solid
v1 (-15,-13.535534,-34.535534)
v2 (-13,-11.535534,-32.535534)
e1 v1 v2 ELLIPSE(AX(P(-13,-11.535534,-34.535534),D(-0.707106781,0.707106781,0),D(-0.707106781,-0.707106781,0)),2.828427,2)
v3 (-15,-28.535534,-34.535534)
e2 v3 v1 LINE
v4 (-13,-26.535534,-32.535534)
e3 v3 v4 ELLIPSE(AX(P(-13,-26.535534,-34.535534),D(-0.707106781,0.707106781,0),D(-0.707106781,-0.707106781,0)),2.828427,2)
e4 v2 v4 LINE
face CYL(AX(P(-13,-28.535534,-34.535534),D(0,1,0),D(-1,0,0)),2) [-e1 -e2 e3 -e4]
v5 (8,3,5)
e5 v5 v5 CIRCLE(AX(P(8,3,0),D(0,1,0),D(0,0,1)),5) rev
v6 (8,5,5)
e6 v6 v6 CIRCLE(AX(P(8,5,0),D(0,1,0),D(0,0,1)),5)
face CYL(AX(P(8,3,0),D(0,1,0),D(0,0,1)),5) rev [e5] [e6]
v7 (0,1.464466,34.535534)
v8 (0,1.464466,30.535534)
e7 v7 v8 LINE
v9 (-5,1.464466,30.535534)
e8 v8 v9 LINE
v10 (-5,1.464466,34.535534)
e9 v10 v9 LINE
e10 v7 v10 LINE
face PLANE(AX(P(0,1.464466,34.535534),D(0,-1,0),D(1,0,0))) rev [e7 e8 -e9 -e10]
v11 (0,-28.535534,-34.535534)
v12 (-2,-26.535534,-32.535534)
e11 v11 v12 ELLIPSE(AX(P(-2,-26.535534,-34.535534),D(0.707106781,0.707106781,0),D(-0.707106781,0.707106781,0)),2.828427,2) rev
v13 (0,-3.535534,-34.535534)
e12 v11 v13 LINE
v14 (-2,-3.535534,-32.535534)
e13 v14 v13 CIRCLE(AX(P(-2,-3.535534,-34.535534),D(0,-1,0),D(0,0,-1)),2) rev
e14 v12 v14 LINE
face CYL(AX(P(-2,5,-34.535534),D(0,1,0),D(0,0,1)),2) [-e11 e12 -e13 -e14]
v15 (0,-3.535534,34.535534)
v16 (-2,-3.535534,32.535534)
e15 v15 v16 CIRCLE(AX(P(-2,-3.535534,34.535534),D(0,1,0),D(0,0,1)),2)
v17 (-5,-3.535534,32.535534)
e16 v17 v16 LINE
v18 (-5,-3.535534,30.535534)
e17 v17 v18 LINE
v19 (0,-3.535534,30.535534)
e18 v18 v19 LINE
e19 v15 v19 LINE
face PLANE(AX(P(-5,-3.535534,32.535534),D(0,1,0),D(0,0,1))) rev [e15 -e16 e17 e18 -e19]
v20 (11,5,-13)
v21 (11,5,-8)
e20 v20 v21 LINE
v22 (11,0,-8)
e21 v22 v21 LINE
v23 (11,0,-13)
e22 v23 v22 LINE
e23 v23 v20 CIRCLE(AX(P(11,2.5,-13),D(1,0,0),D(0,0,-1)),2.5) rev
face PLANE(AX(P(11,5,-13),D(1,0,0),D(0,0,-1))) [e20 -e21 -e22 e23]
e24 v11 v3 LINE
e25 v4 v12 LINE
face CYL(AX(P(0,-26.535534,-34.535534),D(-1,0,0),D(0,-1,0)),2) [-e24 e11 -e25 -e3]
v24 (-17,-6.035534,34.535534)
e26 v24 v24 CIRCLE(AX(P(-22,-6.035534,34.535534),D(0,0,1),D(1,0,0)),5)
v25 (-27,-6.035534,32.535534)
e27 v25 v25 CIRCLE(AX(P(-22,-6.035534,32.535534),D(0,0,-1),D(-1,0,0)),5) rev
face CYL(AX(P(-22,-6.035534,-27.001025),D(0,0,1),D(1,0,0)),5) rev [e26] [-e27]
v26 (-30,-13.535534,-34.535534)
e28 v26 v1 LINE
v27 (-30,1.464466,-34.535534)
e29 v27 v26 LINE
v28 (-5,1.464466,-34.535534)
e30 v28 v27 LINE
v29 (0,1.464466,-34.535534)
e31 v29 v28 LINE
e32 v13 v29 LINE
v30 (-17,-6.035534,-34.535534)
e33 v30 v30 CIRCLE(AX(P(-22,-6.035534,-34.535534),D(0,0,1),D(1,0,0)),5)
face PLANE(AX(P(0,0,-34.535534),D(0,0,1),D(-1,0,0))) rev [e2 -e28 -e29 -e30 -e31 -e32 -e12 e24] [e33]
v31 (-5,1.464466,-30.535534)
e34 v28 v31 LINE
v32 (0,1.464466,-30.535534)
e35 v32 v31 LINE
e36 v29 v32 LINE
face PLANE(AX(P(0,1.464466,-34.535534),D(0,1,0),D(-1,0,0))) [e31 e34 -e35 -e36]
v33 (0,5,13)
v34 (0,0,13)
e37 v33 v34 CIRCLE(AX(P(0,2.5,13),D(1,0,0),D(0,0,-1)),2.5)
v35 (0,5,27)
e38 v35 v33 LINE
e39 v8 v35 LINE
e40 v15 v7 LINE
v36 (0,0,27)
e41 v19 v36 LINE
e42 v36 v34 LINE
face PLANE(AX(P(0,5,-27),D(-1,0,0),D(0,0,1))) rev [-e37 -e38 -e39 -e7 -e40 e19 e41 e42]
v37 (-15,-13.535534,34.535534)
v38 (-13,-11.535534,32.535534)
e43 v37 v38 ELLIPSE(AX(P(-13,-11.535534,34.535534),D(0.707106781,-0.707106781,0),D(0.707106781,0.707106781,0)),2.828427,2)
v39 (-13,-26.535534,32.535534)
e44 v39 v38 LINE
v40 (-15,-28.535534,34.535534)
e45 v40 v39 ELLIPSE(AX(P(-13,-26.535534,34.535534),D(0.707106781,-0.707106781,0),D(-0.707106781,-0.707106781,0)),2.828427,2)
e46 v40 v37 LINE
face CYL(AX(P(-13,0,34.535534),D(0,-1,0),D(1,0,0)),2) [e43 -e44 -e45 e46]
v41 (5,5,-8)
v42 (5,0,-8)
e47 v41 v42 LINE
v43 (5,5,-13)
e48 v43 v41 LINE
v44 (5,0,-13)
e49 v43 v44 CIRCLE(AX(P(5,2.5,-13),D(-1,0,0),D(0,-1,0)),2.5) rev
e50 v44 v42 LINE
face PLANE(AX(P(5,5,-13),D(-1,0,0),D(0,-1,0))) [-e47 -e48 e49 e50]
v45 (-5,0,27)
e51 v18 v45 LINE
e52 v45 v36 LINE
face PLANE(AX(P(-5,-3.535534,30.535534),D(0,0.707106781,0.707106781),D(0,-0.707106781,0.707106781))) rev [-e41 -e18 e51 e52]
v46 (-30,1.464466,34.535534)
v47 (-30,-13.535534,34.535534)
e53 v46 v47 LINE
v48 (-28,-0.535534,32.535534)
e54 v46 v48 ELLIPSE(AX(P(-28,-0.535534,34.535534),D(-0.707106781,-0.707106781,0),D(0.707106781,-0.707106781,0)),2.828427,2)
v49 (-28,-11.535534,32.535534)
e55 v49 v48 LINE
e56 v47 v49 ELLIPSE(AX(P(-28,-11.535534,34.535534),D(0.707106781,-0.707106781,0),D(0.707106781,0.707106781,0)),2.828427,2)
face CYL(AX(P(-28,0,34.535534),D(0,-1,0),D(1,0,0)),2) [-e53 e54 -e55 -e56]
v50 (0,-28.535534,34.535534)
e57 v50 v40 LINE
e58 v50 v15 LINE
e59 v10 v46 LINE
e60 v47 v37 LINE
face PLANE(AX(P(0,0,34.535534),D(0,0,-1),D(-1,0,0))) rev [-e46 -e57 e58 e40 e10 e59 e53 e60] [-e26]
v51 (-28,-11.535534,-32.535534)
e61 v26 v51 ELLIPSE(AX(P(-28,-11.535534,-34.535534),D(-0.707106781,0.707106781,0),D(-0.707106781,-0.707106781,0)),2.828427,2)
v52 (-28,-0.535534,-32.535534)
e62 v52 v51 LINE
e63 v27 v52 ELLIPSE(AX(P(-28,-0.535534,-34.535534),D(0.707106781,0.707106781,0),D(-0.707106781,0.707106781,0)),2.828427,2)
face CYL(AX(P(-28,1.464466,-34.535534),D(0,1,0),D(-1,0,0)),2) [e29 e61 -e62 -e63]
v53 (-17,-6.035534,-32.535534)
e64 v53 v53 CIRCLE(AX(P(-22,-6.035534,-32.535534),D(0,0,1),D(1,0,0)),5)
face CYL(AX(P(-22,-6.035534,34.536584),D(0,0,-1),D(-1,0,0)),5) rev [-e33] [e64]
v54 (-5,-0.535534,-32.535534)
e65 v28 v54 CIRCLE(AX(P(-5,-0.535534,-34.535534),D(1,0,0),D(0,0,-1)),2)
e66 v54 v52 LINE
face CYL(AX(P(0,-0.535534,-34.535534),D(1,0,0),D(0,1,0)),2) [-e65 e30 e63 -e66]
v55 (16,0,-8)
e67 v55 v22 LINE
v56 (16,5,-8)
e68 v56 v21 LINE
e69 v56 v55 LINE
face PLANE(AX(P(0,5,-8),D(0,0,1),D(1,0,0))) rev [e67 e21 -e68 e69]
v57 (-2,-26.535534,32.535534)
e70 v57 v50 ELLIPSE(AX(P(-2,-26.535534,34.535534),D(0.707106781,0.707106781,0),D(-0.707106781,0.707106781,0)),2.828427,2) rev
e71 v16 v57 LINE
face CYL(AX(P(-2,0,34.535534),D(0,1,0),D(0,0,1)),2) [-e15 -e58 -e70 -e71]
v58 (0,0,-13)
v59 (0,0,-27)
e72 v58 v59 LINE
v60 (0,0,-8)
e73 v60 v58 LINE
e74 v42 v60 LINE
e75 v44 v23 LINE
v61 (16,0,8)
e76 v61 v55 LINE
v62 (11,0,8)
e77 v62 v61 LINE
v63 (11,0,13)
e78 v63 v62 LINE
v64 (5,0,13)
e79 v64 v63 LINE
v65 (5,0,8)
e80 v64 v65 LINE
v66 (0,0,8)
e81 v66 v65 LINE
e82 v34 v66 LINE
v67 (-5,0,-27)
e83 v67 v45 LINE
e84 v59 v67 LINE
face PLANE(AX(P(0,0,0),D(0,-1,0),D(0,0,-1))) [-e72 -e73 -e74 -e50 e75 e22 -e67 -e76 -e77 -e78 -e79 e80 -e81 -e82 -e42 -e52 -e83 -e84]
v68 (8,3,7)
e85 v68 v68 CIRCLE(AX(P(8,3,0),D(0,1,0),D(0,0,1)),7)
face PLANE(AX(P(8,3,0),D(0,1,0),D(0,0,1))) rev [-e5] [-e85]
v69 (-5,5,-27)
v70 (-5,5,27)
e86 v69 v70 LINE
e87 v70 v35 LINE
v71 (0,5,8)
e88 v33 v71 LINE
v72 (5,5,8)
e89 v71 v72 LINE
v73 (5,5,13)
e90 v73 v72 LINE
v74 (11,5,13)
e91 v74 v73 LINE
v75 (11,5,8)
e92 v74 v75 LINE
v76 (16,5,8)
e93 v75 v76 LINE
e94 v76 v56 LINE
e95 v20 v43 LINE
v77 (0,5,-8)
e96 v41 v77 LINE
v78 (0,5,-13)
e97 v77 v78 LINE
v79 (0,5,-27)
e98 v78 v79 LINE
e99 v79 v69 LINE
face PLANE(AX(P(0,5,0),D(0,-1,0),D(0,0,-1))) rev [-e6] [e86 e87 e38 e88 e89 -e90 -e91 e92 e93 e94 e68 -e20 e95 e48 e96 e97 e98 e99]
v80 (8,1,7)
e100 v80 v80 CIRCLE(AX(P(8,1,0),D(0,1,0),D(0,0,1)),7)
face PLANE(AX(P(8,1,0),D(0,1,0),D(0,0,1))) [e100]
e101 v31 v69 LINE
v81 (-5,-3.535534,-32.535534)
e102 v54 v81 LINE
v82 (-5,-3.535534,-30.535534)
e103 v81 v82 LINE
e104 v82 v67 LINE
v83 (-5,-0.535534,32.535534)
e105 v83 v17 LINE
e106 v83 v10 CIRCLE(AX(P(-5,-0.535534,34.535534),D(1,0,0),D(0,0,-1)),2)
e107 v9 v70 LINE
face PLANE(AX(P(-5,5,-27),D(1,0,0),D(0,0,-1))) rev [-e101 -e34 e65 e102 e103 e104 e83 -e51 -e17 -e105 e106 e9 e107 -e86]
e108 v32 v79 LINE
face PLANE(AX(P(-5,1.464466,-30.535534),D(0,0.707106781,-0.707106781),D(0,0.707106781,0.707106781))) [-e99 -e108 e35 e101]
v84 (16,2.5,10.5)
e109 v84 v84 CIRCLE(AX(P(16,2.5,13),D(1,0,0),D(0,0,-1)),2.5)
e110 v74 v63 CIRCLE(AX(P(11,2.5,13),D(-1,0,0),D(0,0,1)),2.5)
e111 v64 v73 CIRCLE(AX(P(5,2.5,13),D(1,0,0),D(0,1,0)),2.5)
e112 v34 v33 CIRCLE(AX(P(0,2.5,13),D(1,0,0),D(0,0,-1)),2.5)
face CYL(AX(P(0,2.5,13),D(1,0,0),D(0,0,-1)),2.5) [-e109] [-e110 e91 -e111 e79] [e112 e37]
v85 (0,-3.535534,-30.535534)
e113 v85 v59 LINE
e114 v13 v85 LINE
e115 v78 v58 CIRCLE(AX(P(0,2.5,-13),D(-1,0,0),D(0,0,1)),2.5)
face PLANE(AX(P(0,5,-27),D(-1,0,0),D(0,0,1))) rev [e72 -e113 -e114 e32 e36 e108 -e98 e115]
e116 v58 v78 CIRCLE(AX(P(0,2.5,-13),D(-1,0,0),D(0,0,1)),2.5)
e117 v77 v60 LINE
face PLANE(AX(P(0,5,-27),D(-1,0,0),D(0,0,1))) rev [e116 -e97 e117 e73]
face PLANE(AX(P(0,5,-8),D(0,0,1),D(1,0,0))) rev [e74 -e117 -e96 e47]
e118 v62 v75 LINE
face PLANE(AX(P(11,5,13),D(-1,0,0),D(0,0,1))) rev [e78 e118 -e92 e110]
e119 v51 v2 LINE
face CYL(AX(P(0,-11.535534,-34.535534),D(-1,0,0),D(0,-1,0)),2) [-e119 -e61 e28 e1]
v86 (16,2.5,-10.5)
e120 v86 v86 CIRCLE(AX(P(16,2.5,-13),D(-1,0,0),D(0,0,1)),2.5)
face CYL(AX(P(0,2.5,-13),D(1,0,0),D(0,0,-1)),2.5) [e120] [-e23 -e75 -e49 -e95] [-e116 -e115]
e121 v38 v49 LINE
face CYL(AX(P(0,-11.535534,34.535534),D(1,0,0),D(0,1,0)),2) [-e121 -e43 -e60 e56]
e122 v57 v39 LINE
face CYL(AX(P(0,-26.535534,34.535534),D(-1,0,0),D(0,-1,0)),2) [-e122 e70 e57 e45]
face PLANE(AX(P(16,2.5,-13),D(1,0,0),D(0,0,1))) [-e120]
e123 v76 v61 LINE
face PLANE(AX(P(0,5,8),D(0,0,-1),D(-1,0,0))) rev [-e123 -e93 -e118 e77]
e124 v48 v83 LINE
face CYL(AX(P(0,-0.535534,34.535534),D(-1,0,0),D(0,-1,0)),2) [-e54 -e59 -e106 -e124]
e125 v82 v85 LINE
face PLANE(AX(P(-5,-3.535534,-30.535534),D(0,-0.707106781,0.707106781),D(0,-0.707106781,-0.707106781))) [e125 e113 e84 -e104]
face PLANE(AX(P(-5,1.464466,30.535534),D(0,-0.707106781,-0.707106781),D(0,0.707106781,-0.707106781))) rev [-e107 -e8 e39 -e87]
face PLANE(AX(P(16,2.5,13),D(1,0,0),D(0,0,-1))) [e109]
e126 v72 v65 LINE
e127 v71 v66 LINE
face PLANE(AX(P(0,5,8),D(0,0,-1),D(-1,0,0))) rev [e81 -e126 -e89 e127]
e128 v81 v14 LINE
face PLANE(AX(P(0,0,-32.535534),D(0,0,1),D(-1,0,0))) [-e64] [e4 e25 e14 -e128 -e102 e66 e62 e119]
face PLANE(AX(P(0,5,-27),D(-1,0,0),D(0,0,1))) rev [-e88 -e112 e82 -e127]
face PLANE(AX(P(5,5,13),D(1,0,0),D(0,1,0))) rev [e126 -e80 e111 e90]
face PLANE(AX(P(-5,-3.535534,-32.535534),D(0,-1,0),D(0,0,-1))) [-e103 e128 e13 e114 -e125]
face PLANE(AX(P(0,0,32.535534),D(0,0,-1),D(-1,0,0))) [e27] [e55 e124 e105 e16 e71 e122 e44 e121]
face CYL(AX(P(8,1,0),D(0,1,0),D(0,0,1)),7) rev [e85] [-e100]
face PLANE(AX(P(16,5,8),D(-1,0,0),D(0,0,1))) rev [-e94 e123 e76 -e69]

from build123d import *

# Parameters (mm, degrees)
SKETCH1_W            = 5
SKETCH1_H            = 54
BOSS_EXTRUDE1_DEPTH  = 5
SKETCH3_W            = 16
SKETCH3_H            = 16
BOSS_EXTRUDE2_DEPTH  = 5
SKETCH6_W            = 5
SKETCH6_H            = 5
BOSS_EXTRUDE5_DEPTH  = 5
SKETCH10_W           = 30
SKETCH10_H           = 15
BOSS_EXTRUDE9_DEPTH  = 4
CUT_EXTRUDE1_DEPTH   = 2
CUT_EXTRUDE2_REACH   = 71.784
SKETCH11_R           = 5
SKETCH13_W           = 15
SKETCH13_H           = 2
BOSS_EXTRUDE10_DEPTH = 15
SKETCH4_R            = 5
CUT_EXTRUDE3_DEPTH   = 2
SKETCH14_R           = 7
CUT_EXTRUDE4_DEPTH   = 2
SKETCH16_W           = 6
SKETCH16_H           = 5
BOSS_EXTRUDE11_DEPTH = 5
BOSS_EXTRUDE12_START = -11
SKETCH17_R           = 2.5
BOSS_EXTRUDE12_DEPTH = 16
FILLET1_R            = 2


with BuildPart() as part:
    # Sketch1 → Boss-Extrude1 (new body)
    with BuildSketch(Plane(origin=(0, 0, 0), x_dir=(1, 0, 0), z_dir=(0, 1, 0))):
        with Locations((-2.5, 0)):
            Rectangle(SKETCH1_W, SKETCH1_H)
    extrude(amount=BOSS_EXTRUDE1_DEPTH)

    # Sketch3 → Boss-Extrude2 (add)
    with BuildSketch(Plane(origin=(0, 0, 0), x_dir=(1, 0, 0), z_dir=(0, 1, 0))):
        with Locations((8, 0)):
            Rectangle(SKETCH3_W, SKETCH3_H)
    extrude(amount=BOSS_EXTRUDE2_DEPTH)

    # Sketch6 → Boss-Extrude5 (add, along a direction that is not the sketch's normal)
    with BuildSketch(Plane.XY.offset(27)):
        with Locations((-2.5, 2.5)):
            Rectangle(SKETCH6_W, SKETCH6_H)
    boss_extrude5 = extrude(amount=BOSS_EXTRUDE5_DEPTH, dir=(0, -0.7071067811865479, 0.7071067811865472))

    # Sketch10 → Boss-Extrude9 (add)
    with BuildSketch(Plane.XY.offset(30.535533906)):
        with Locations((-15, -6.035533906)):
            Rectangle(SKETCH10_W, SKETCH10_H)
    boss_extrude9 = extrude(amount=BOSS_EXTRUDE9_DEPTH)

    # Sketch12 → Cut-Extrude1 (cut)
    with BuildSketch(Plane(origin=(0, 0, 30.535533906), x_dir=(-1, 0, 0), z_dir=(0, 0, -1))):
        Polygon((30, -13.535533906), (30, 1.464466094), (5, 1.464466094), (5, -3.535533906), (0, -3.535533906), (0, -13.535533906), align=None)
    cut_extrude1 = extrude(amount=-CUT_EXTRUDE1_DEPTH, mode=Mode.SUBTRACT)

    # Sketch11 → Cut-Extrude2 (cut, up to next)
    with BuildSketch(Plane.XY.offset(34.535533906), mode=Mode.PRIVATE) as cut_extrude2_sk1:
        with Locations((-22, -6.035533906)):
            Circle(SKETCH11_R)
    cut_extrude2_tool1 = extrude(cut_extrude2_sk1.sketch, amount=-CUT_EXTRUDE2_REACH, mode=Mode.PRIVATE) & part.part
    cut_extrude2 = cut_extrude2_tool1.solids().sort_by_distance((-22, -6.035534, 34.535534))[0]
    add(cut_extrude2, mode=Mode.SUBTRACT)

    # Sketch13 → Boss-Extrude10 (add)
    with BuildSketch(Plane.XZ.offset(13.535533906)):
        with Locations((-7.5, 33.535533906)):
            Rectangle(SKETCH13_W, SKETCH13_H)
    boss_extrude10 = extrude(amount=BOSS_EXTRUDE10_DEPTH)

    # Sketch4 → Cut-Extrude3 (cut)
    with BuildSketch(Plane(origin=(0, 5, 0), x_dir=(1, 0, 0), z_dir=(0, 1, 0))):
        with Locations(Location((8, 0, 0), (0, 0, 270))):
            Circle(SKETCH4_R)
    extrude(amount=-CUT_EXTRUDE3_DEPTH, mode=Mode.SUBTRACT)

    # Sketch14 → Cut-Extrude4 (cut)
    with BuildSketch(Plane(origin=(0, 3, 0), x_dir=(1, 0, 0), z_dir=(0, 1, 0))):
        with Locations(Location((8, 0, 0), (0, 0, 270))):
            Circle(SKETCH14_R)
    extrude(amount=-CUT_EXTRUDE4_DEPTH, mode=Mode.SUBTRACT)

    # Sketch16 → Boss-Extrude11 (add)
    with BuildSketch(Plane.XY.offset(8)):
        with Locations((8, 2.5)):
            Rectangle(SKETCH16_W, SKETCH16_H)
    boss_extrude11 = extrude(amount=BOSS_EXTRUDE11_DEPTH)

    # Sketch17 → Boss-Extrude12 (add)
    with BuildSketch(Plane(origin=(11, 0, 0), x_dir=(0, 0, -1), z_dir=(1, 0, 0)).offset(BOSS_EXTRUDE12_START)):
        with Locations((-13, 2.5)):
            Circle(SKETCH17_R)
    boss_extrude12 = extrude(amount=BOSS_EXTRUDE12_DEPTH)

    # Mirror2: Boss-Extrude5, Boss-Extrude9, Cut-Extrude1, Cut-Extrude2, Boss-Extrude10, Boss-Extrude11, Boss-Extrude12 across plane
    add(boss_extrude5.mirror(Plane.XY))
    add(boss_extrude9.mirror(Plane.XY))
    add(cut_extrude1.mirror(Plane.XY), mode=Mode.SUBTRACT)
    add(cut_extrude2.mirror(Plane.XY), mode=Mode.SUBTRACT)
    add(boss_extrude10.mirror(Plane.XY))
    add(boss_extrude11.mirror(Plane.XY))
    add(boss_extrude12.mirror(Plane.XY))

    # Fillet1
    fillet1_edges = [part.edges().sort_by_distance(p)[0] for p in [
        (0, -16.035533906, -32.535533906),
        (0, -16.035533906, 32.535533906),
        (-7.5, -28.535533906, 32.535533906),
        (-17.5, 1.464466094, -32.535533906),
        (-30, -6.035533906, -32.535533906),
        (-22.5, -13.535533906, -32.535533906),
        (-15, -21.035533906, -32.535533906),
        (-7.5, -28.535533906, -32.535533906),
        (-17.5, 1.464466094, 32.535533906),
        (-30, -6.035533906, 32.535533906),
        (-22.5, -13.535533906, 32.535533906),
        (-15, -21.035533906, 32.535533906),
    ]]
    fillet(fillet1_edges, radius=FILLET1_R - 0.0001)  # a hair under: the kernel refuses the full size


solid = part.part
